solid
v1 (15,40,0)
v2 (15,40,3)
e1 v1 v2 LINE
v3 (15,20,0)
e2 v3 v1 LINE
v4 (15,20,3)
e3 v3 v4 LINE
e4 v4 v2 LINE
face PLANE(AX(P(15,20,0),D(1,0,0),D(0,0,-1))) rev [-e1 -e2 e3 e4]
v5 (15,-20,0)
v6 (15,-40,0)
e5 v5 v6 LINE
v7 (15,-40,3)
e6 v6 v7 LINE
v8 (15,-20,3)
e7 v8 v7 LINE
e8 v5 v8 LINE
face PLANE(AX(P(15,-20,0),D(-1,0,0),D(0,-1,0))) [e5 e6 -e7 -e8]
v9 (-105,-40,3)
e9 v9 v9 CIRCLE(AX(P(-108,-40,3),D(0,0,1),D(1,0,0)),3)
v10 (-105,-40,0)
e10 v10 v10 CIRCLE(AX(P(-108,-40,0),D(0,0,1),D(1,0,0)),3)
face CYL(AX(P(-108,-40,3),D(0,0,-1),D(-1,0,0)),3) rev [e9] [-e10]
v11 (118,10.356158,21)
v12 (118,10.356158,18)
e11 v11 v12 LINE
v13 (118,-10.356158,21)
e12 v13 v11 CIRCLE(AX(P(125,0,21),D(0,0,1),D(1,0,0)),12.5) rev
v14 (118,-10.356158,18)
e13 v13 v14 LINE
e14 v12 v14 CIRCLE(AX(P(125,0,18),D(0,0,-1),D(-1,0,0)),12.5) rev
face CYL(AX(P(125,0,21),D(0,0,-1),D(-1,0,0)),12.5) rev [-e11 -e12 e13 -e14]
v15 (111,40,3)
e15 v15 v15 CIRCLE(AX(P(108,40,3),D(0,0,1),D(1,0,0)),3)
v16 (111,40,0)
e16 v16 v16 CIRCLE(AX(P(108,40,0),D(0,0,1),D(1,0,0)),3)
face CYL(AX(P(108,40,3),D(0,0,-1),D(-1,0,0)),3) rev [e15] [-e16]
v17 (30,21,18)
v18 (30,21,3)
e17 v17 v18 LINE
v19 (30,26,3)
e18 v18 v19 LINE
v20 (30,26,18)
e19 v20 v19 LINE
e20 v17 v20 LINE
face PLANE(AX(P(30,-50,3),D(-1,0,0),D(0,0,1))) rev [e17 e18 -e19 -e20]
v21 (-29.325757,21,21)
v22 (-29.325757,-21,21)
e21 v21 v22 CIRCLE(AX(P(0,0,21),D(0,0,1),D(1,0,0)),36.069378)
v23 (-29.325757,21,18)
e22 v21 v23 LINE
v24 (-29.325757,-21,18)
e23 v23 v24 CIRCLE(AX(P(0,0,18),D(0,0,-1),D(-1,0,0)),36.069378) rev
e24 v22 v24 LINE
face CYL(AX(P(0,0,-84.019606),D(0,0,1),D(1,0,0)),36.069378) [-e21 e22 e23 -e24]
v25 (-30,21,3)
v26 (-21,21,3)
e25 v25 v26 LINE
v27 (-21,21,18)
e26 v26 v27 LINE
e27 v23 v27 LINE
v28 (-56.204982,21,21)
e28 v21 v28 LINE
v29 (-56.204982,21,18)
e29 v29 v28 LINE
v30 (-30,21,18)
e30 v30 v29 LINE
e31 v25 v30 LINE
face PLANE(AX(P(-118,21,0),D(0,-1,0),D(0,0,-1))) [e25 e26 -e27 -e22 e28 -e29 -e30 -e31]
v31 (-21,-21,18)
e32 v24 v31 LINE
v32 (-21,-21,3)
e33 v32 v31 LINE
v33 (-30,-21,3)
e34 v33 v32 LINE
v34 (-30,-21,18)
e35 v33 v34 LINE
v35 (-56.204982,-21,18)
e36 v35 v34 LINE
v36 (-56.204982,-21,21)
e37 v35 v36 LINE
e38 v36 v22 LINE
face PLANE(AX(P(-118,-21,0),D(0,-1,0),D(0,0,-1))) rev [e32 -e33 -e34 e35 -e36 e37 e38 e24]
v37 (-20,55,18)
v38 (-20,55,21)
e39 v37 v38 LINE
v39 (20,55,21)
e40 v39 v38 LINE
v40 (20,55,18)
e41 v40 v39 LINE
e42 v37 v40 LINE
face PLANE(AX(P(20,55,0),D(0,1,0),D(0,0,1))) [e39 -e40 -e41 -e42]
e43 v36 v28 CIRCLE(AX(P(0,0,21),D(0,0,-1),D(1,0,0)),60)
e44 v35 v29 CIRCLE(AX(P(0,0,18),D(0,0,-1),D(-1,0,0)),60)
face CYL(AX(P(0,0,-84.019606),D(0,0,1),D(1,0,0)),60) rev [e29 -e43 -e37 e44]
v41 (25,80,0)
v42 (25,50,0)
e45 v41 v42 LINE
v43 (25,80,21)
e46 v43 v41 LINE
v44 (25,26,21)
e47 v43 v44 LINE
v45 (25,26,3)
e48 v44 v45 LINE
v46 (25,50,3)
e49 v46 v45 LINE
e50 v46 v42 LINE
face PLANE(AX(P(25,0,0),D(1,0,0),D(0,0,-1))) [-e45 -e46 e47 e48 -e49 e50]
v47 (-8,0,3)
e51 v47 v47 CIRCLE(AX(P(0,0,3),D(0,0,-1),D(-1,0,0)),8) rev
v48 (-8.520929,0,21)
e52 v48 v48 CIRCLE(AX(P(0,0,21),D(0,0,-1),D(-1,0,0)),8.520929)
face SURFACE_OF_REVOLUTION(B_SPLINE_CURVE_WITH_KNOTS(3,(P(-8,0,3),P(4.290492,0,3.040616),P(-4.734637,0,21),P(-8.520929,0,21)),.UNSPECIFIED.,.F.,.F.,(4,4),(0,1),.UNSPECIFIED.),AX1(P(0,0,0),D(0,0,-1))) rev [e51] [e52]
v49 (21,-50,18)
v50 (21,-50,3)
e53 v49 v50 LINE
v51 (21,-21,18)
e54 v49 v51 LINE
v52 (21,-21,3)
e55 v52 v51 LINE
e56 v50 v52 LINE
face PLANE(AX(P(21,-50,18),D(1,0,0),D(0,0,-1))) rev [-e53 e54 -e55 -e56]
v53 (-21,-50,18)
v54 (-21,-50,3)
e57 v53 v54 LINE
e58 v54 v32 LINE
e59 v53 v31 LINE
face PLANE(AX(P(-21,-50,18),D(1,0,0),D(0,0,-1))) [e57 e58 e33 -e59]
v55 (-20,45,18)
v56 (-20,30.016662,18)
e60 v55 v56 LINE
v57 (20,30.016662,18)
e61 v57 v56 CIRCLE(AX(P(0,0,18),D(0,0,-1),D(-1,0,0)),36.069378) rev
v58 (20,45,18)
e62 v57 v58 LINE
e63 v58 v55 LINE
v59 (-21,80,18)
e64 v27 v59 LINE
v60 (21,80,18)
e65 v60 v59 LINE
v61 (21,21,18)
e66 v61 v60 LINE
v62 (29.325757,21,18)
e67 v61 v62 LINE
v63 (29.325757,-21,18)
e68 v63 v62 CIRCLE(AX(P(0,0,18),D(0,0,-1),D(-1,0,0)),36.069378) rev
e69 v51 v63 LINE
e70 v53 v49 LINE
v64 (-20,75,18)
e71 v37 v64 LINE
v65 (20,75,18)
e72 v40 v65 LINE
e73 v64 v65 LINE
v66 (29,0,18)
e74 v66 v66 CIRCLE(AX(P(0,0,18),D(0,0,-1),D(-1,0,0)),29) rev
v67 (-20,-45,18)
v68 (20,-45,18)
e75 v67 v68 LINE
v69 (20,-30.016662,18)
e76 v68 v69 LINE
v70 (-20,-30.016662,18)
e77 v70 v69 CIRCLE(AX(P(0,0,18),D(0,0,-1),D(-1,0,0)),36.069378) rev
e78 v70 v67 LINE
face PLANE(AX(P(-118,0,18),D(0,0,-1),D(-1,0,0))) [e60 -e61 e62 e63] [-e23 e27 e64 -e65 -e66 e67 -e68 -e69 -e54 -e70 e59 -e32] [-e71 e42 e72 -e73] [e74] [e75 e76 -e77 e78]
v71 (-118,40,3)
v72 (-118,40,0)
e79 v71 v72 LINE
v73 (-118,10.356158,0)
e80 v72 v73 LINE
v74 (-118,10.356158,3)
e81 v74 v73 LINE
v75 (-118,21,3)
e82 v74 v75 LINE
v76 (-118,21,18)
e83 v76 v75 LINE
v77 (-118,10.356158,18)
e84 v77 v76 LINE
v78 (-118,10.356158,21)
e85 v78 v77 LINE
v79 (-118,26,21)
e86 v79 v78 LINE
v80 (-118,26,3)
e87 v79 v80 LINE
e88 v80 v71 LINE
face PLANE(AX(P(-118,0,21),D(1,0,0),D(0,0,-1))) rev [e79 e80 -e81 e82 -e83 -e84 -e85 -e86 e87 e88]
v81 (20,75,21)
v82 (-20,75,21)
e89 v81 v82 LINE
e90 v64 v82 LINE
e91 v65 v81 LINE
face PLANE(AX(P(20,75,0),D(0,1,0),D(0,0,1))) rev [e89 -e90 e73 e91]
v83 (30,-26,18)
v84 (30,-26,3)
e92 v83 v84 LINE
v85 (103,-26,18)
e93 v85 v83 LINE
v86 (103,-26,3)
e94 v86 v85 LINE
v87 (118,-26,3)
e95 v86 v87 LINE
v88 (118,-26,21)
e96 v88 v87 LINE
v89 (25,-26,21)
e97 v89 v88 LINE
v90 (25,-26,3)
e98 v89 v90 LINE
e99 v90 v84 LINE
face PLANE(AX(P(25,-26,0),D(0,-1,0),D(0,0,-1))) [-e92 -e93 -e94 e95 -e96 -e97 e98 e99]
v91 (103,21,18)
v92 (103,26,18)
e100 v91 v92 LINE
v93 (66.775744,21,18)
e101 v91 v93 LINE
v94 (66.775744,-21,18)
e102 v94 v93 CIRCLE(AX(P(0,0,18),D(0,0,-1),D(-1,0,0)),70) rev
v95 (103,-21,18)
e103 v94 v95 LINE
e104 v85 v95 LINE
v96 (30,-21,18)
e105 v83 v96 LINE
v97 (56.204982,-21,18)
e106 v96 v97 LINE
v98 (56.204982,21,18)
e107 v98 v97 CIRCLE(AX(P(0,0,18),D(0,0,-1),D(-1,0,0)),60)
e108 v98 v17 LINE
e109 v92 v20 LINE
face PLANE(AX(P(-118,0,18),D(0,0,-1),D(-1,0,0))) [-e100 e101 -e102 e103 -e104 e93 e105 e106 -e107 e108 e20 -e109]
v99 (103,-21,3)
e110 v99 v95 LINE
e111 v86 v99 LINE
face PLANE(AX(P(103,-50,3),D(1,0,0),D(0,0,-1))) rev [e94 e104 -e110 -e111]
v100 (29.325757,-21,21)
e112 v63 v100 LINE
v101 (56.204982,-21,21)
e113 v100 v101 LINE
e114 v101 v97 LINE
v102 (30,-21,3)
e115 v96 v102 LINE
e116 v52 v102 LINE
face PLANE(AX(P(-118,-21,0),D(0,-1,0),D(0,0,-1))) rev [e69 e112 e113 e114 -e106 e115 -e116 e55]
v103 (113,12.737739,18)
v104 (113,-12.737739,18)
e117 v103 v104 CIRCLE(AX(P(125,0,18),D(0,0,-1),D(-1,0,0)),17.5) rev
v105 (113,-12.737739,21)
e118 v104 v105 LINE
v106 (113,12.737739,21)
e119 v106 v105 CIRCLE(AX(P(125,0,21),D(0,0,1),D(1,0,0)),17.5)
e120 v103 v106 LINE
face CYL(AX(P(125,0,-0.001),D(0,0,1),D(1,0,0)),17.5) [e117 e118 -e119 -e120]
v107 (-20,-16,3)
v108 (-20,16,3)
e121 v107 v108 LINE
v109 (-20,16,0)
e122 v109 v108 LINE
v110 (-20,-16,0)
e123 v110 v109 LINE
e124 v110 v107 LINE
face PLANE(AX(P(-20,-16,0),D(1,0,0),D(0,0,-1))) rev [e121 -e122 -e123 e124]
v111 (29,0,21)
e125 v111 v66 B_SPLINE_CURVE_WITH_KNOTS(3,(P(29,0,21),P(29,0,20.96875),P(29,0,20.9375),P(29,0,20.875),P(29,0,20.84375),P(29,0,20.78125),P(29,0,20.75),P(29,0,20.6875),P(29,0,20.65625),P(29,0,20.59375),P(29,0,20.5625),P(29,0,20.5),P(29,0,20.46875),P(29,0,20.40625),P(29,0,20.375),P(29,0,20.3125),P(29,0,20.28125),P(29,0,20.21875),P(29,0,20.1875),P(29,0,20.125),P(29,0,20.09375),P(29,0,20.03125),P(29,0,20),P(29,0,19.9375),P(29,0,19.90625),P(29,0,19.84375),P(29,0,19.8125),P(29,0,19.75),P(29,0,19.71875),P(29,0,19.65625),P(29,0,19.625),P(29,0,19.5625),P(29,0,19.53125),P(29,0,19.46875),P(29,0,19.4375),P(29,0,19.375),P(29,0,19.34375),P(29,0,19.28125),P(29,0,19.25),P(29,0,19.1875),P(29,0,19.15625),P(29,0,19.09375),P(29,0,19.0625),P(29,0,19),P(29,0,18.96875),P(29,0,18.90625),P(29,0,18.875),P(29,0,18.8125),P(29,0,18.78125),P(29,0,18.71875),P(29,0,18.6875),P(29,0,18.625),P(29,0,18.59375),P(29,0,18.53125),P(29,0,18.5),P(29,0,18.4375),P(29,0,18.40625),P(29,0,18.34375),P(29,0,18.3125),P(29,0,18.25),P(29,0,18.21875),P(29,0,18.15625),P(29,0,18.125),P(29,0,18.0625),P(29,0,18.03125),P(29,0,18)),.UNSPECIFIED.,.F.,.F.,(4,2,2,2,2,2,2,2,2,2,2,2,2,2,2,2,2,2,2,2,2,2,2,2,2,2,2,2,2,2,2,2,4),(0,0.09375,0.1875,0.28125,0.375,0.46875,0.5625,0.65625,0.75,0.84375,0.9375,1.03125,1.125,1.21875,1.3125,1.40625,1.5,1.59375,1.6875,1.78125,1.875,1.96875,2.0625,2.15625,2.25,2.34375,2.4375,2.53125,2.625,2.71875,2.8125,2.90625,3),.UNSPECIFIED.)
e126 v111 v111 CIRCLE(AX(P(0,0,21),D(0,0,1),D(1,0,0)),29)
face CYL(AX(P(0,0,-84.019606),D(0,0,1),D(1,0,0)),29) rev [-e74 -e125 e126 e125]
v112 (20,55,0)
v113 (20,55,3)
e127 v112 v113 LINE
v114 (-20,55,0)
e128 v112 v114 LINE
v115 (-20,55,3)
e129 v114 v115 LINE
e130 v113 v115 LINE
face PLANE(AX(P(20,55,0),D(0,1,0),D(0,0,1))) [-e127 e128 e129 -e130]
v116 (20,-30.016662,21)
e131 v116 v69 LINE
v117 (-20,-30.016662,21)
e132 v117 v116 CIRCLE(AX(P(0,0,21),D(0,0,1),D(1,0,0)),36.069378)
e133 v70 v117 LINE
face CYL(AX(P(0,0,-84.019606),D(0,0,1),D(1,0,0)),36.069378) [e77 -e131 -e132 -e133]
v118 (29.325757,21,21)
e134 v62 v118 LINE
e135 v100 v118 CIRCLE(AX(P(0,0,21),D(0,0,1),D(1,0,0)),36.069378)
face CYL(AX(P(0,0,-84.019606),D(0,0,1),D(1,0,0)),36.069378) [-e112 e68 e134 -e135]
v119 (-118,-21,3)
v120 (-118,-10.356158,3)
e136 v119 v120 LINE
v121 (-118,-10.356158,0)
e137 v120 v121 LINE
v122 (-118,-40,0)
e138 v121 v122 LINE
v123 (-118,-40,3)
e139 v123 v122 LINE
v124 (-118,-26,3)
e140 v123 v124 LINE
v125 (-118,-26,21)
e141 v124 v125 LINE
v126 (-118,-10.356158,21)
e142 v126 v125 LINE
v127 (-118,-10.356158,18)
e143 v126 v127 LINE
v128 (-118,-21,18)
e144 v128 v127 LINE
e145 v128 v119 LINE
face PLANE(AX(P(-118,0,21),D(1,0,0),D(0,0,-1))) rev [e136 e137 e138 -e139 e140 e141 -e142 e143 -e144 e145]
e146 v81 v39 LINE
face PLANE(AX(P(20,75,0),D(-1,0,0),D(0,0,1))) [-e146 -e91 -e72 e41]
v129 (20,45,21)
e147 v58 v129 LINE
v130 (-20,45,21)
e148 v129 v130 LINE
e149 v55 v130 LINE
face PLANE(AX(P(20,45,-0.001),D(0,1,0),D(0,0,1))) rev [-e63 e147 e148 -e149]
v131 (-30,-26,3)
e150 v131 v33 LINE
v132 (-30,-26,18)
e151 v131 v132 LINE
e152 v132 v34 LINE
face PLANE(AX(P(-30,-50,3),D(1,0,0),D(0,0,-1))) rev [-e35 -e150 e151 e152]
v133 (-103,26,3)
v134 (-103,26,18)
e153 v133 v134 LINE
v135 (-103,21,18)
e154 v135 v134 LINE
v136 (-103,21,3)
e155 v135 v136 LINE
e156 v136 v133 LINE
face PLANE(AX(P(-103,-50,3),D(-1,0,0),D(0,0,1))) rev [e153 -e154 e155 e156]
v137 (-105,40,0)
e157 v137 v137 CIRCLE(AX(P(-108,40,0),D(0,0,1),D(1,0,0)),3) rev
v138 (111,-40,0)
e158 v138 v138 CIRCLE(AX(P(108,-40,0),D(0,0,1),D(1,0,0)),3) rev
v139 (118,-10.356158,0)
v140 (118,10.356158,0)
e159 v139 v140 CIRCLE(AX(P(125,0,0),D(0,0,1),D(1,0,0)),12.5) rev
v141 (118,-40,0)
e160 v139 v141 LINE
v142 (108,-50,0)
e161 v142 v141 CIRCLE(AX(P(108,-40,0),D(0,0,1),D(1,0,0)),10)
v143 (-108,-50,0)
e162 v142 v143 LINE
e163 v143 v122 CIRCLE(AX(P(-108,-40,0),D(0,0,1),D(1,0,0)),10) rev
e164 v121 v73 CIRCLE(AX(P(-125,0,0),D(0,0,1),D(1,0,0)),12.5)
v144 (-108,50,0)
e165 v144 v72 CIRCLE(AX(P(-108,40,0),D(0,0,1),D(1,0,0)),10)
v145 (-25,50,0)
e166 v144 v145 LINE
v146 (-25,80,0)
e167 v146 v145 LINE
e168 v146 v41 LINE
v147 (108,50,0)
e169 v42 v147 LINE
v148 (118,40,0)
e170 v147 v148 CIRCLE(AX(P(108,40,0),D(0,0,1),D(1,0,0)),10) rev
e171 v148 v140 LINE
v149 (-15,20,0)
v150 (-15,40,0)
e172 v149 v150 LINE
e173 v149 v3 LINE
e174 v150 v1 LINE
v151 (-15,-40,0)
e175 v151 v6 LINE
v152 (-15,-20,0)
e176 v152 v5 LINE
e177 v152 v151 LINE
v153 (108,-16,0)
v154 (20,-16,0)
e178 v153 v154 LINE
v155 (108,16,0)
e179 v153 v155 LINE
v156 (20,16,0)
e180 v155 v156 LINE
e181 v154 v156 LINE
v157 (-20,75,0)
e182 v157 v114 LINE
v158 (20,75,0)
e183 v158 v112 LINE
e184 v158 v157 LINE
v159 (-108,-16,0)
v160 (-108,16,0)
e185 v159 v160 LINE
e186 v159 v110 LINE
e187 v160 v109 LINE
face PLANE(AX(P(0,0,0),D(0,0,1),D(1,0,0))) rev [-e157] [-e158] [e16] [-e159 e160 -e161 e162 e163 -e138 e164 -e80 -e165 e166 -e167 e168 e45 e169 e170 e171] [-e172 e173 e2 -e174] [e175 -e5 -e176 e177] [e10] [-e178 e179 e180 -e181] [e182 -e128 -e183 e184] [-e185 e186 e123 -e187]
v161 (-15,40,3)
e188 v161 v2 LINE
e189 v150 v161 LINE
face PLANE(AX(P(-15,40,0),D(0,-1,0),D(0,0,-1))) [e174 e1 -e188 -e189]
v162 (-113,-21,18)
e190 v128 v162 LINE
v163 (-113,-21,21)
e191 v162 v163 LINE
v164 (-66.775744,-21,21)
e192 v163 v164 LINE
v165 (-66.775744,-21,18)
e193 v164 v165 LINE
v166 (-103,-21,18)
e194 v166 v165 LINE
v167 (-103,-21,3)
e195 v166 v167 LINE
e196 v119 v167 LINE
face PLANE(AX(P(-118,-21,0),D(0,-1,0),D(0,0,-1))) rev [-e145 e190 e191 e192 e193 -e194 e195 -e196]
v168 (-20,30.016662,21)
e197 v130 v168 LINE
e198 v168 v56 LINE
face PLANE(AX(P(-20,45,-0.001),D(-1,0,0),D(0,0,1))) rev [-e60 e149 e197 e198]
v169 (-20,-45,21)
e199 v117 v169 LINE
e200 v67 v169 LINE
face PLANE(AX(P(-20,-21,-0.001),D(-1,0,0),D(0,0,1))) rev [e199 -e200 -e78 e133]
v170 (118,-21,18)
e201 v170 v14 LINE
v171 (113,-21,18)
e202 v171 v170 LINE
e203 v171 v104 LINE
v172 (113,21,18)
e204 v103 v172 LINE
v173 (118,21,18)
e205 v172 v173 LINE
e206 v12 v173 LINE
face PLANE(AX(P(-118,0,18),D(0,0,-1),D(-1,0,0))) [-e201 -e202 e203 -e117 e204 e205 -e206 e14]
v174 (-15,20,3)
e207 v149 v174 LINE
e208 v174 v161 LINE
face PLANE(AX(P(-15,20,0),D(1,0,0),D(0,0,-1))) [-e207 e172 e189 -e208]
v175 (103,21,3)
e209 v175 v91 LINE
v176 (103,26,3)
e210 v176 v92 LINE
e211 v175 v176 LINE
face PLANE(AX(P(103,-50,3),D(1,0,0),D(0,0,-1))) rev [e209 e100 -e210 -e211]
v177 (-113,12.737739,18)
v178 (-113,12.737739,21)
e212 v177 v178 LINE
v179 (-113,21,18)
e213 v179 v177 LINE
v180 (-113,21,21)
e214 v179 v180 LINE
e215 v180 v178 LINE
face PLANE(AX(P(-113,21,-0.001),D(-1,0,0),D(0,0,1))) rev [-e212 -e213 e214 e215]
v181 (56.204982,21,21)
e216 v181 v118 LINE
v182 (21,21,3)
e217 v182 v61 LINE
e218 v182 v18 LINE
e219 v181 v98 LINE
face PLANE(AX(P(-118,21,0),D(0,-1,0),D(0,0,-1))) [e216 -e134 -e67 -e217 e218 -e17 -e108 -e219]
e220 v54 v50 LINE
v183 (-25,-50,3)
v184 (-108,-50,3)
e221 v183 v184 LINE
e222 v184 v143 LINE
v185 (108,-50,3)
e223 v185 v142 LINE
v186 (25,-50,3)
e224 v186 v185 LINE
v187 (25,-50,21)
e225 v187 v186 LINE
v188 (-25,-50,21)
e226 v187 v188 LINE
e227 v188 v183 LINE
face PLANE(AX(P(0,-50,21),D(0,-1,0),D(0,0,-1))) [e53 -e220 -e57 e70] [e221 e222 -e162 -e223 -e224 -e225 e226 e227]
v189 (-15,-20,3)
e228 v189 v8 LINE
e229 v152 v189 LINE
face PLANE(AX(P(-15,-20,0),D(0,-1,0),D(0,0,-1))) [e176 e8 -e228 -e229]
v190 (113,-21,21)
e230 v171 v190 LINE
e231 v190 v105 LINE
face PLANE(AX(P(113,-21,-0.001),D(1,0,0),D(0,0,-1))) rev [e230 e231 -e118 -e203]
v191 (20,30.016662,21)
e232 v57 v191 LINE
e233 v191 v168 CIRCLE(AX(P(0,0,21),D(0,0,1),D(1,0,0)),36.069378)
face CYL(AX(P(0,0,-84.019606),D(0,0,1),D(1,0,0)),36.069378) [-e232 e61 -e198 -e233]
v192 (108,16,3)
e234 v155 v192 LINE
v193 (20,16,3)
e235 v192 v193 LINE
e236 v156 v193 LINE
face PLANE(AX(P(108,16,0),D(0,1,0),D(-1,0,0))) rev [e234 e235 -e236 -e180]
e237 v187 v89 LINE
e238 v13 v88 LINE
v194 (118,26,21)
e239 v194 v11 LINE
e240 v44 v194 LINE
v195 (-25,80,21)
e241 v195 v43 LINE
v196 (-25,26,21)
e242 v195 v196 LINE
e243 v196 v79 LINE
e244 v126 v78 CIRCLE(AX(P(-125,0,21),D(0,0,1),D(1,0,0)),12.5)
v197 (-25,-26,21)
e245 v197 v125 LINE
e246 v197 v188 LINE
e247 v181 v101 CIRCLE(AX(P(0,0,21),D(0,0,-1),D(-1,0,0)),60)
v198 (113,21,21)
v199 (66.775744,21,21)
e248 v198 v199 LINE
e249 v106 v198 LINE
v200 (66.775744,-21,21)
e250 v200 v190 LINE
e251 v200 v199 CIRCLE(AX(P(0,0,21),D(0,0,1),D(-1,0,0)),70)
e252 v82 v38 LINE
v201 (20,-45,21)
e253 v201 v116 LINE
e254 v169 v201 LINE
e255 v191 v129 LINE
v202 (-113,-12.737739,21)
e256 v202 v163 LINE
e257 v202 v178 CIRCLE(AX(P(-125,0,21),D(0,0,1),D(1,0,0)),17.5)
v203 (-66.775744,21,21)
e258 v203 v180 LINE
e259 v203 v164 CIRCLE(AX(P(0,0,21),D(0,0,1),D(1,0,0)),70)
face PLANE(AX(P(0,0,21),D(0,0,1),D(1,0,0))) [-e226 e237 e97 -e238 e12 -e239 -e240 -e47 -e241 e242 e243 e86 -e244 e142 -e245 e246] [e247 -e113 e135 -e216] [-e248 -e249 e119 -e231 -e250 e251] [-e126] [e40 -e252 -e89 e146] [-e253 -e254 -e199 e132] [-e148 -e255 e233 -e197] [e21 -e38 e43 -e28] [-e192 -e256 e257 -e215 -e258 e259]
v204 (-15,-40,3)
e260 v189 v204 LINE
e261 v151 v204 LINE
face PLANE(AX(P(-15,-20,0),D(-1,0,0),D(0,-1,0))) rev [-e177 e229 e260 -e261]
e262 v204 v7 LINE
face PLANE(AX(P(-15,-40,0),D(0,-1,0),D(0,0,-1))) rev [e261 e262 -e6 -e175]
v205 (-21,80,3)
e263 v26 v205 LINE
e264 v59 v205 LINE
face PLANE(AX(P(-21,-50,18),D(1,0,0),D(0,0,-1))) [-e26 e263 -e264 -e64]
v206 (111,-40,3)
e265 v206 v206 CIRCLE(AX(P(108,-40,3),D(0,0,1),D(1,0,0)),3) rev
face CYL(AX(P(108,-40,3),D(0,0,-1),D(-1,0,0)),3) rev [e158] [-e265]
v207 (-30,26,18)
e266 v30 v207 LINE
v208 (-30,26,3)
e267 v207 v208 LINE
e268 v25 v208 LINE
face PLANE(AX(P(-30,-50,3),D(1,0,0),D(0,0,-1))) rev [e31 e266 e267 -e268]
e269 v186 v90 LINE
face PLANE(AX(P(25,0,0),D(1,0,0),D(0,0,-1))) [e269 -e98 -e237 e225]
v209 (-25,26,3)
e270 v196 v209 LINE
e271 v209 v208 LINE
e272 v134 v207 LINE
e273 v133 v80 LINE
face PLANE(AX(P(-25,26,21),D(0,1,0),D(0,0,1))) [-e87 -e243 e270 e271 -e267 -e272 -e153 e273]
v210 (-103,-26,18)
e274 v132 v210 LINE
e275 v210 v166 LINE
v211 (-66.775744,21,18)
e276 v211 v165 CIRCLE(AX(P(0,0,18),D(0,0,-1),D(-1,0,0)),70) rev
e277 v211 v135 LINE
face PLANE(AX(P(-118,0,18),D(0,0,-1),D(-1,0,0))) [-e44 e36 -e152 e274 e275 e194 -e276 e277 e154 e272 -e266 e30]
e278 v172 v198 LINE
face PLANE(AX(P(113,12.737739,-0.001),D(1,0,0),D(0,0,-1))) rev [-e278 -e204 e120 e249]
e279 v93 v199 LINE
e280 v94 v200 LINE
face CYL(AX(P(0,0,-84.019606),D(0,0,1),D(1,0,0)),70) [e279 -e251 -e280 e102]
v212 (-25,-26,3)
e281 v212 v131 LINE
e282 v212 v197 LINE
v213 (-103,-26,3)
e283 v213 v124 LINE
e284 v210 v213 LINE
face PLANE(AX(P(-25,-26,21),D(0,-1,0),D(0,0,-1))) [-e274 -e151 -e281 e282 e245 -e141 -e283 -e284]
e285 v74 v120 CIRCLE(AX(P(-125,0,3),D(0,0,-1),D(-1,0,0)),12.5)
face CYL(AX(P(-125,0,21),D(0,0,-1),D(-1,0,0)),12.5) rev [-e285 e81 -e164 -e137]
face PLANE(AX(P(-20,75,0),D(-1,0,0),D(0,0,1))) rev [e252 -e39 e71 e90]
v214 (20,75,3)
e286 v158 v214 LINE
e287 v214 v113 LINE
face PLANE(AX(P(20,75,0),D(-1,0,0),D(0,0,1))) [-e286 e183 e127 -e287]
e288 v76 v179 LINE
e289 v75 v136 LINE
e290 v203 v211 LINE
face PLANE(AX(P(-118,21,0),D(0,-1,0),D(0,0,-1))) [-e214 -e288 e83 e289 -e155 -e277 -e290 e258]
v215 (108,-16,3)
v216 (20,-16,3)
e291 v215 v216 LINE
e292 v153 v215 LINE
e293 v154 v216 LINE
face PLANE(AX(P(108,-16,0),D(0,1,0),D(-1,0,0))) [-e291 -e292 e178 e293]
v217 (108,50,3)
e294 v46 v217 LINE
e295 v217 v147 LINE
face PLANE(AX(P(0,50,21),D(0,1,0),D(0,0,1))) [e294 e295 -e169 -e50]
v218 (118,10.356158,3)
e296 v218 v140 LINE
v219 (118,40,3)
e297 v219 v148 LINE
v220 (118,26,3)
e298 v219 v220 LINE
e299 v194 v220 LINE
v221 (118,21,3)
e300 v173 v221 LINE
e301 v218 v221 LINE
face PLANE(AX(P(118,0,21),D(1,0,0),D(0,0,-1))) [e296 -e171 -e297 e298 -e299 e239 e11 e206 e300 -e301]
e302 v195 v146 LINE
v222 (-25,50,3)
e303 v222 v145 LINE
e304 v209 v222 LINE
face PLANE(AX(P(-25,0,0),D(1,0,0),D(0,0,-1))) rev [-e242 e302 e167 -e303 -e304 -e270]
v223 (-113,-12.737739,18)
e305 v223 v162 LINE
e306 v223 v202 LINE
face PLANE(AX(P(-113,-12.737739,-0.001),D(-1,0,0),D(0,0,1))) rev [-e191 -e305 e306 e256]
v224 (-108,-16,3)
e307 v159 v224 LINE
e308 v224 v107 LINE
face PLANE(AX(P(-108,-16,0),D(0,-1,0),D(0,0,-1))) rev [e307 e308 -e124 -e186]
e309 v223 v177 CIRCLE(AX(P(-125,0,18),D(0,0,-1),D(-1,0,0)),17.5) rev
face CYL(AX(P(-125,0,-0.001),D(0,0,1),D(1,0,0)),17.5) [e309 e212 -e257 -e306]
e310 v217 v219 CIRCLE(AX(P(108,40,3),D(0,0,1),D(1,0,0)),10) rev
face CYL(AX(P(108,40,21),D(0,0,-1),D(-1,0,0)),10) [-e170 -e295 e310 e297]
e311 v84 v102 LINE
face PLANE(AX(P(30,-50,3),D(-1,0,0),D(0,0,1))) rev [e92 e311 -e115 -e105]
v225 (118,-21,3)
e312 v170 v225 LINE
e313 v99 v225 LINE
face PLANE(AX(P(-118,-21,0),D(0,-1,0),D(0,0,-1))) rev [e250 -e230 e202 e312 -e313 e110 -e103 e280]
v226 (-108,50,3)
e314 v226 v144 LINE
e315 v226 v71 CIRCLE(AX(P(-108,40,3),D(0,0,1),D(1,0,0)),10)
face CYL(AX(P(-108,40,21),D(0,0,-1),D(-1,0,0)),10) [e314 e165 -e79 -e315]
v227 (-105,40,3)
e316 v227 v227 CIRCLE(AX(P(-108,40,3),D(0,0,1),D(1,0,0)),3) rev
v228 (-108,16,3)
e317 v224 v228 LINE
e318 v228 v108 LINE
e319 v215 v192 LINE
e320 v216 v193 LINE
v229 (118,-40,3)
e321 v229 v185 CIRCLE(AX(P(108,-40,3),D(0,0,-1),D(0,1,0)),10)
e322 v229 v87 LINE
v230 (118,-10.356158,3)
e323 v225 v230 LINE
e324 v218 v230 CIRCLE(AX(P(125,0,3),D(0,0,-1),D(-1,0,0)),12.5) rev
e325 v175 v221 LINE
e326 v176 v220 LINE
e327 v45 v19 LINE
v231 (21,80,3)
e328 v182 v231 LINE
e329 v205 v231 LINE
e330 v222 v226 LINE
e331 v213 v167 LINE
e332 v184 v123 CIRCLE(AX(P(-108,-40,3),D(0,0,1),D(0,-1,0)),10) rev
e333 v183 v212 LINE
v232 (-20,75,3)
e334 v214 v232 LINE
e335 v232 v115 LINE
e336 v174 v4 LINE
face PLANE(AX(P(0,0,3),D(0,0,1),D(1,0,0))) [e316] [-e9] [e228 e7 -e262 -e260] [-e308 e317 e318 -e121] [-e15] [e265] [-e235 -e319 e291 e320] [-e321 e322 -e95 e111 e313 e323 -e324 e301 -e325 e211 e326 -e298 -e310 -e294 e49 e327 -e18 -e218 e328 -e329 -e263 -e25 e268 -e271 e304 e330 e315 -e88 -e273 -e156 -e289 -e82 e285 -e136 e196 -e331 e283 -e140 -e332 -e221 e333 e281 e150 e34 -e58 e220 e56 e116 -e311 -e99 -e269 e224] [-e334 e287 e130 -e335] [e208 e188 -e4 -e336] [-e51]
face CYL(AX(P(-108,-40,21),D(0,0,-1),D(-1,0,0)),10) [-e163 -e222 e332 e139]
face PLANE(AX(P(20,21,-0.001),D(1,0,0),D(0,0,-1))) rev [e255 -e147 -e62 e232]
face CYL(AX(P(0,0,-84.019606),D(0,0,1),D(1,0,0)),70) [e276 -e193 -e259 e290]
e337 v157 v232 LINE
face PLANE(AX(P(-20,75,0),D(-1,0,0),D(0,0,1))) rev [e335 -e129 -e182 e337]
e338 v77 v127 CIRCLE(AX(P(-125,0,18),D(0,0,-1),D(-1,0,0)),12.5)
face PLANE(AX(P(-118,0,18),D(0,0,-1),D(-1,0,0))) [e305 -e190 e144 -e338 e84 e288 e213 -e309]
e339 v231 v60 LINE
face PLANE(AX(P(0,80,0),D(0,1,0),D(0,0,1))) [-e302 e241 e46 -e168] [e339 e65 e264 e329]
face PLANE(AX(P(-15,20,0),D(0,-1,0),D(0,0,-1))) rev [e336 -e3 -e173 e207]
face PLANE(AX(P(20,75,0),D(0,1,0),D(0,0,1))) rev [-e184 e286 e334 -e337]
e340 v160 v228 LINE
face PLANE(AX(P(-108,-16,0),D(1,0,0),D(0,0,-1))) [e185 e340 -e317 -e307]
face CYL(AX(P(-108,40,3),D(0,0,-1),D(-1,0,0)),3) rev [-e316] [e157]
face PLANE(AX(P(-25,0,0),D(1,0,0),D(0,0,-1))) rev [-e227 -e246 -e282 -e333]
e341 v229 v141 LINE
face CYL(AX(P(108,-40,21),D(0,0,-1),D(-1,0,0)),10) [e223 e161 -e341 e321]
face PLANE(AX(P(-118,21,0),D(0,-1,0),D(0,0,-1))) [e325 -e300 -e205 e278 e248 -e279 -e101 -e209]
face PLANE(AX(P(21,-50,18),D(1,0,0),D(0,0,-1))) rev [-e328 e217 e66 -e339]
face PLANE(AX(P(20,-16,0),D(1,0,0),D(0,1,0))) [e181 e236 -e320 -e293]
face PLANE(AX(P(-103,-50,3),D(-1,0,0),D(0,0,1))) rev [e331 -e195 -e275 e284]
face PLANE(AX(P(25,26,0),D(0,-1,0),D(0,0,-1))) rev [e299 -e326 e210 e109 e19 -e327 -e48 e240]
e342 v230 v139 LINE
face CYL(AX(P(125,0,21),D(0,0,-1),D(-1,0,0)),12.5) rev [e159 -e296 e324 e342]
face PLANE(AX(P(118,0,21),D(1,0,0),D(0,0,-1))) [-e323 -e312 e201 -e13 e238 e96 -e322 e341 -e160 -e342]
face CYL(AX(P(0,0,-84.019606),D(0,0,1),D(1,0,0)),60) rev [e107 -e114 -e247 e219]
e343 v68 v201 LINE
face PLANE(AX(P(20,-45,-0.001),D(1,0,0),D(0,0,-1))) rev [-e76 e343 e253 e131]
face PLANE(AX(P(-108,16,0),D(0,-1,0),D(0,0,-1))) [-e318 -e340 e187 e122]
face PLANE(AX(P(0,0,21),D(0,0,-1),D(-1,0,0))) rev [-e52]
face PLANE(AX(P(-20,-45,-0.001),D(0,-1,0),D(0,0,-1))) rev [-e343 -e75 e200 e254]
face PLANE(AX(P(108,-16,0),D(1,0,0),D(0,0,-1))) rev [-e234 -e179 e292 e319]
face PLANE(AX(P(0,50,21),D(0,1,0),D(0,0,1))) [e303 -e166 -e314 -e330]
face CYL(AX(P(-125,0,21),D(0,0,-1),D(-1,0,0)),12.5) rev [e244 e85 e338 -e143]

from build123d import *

# Parameters (mm, degrees)
EXTRUDE_1_OUTLINE_R   = 6
EXTRUDE_1_DEPTH       = 21
EXTRUDE_2_OUTLINE_R   = 6
EXTRUDE_2_OUTLINE_R_2 = 3
EXTRUDE_2_DEPTH       = 3
SKETCH_2_W            = 15
SKETCH_2_H            = 42
CUT_EXTRUDE_1_DEPTH   = 243.150779474
SKETCH_3_W            = 42
SKETCH_3_H            = 15
CUT_EXTRUDE_2_DEPTH   = 157.092921044
SKETCH_2_3_W          = 18
SKETCH_2_3_H          = 14
SKETCH_2_3_H_2        = 10
SKETCH_2_3_H_3        = 24
CUT_EXTRUDE_3_DEPTH   = 93
CUT_EXTRUDE_START     = -236
SKETCH_2_4_W          = 15
SKETCH_2_4_H          = 42
SKETCH_2_4_W_2        = 18
SKETCH_2_4_H_2        = 24
CUT_EXTRUDE_4_DEPTH   = 93
SKETCH_3_3_W          = 42
SKETCH_3_3_H          = 15
SKETCH_3_3_W_2        = 73
CUT_EXTRUDE_5_DEPTH   = 157.092921044
CUT_EXTRUDE_6_REACH   = 131.865
SKETCH_6_W            = 88
SKETCH_6_H            = 32
SKETCH_6_W_2          = 30
SKETCH_6_H_2          = 20
CUT_EXTRUDE_7_DEPTH   = 130.414064165
SKETCH_7_R            = 36.069377594
SKETCH_7_R_2          = 29
EXTRUDE_3_DEPTH       = 3
SKETCH_8_W            = 50
SKETCH_8_H            = 21
SKETCH_8_W_2          = 42
SKETCH_8_H_2          = 15
EXTRUDE_4_DEPTH       = 30
SKETCH_9_W            = 40
SKETCH_9_H            = 20
CUT_EXTRUDE_8_DEPTH   = 145.100659263


# Read off the part's stored shape, not the designer's step: 凸台-拉伸1, 凸台-拉伸2
with BuildPart() as part:
    # 凸台-拉伸1 outline → 凸台-拉伸1 (new body)
    with BuildSketch(Plane.XY):
        with BuildLine():
            ThreePointArc((118, 40), (115.071067812, 47.071067812), (108, 50))
            Line((108, 50), (-108, 50))
            ThreePointArc((-108, 50), (-115.071067812, 47.071067812), (-118, 40))
            Line((-118, 40), (-118, 10.356157589))
            ThreePointArc((-118, 10.356157589), (-112.5, 0), (-118, -10.356157589))
            Line((-118, -10.356157589), (-118, -40))
            ThreePointArc((-118, -40), (-115.071067812, -47.071067812), (-108, -50))
            Line((-108, -50), (108, -50))
            ThreePointArc((108, -50), (115.071067812, -47.071067812), (118, -40))
            Line((118, -40), (118, -10.356157589))
            ThreePointArc((118, -10.356157589), (112.5, 0), (118, 10.356157589))
            Line((118, 10.356157589), (118, 40))
        make_face()
        with Locations((-108, -40)):
            Circle(EXTRUDE_1_OUTLINE_R, mode=Mode.SUBTRACT)
        with Locations((108, -40)):
            Circle(EXTRUDE_1_OUTLINE_R, mode=Mode.SUBTRACT)
        with Locations((-108, 40)):
            Circle(EXTRUDE_1_OUTLINE_R, mode=Mode.SUBTRACT)
        with Locations((108, 40)):
            Circle(EXTRUDE_1_OUTLINE_R, mode=Mode.SUBTRACT)
    extrude(amount=EXTRUDE_1_DEPTH)

    # 凸台-拉伸2 outline → 凸台-拉伸2 (add)
    # profile 1 of 4: a face of its own
    with BuildSketch(Plane.XY):
        with Locations((108, -40)):
            Circle(EXTRUDE_2_OUTLINE_R)
        with Locations((108, -40)):
            Circle(EXTRUDE_2_OUTLINE_R_2, mode=Mode.SUBTRACT)
    # profile 2 of 4: a face of its own
    with BuildSketch(Plane.XY):
        with Locations((-108, 40)):
            Circle(EXTRUDE_2_OUTLINE_R)
        with Locations((-108, 40)):
            Circle(EXTRUDE_2_OUTLINE_R_2, mode=Mode.SUBTRACT)
    # profile 3 of 4: a face of its own
    with BuildSketch(Plane.XY):
        with Locations((-108, -40)):
            Circle(EXTRUDE_2_OUTLINE_R)
        with Locations((-108, -40)):
            Circle(EXTRUDE_2_OUTLINE_R_2, mode=Mode.SUBTRACT)
    # profile 4 of 4: a face of its own
    with BuildSketch(Plane.XY):
        with Locations((108, 40)):
            Circle(EXTRUDE_2_OUTLINE_R)
        with Locations((108, 40)):
            Circle(EXTRUDE_2_OUTLINE_R_2, mode=Mode.SUBTRACT)
    extrude(amount=EXTRUDE_2_DEPTH)

    # 草图2 → 切除-拉伸1 (cut, through all)
    with BuildSketch(Plane(origin=(118, 0, 0), x_dir=(0, 0, -1), z_dir=(1, 0, 0))):
        with Locations((-10.5, 0)):
            Rectangle(SKETCH_2_W, SKETCH_2_H)
    extrude(amount=-CUT_EXTRUDE_1_DEPTH, mode=Mode.SUBTRACT)

    # 草图3 → 切除-拉伸2 (cut, through all)
    with BuildSketch(Plane(origin=(0, 50, 0), x_dir=(1, 0, 0), z_dir=(0, 1, 0))):
        with Locations((0, -10.5)):
            Rectangle(SKETCH_3_W, SKETCH_3_H)
    extrude(amount=-CUT_EXTRUDE_2_DEPTH, mode=Mode.SUBTRACT)

    # 草图2<3> → 切除-拉伸3 (cut)
    with BuildSketch(Plane(origin=(118, 0, 0), x_dir=(0, 0, -1), z_dir=(1, 0, 0))):
        with Locations((-12, 33)):
            Rectangle(SKETCH_2_3_W, SKETCH_2_3_H)
        with Locations((-12, 45)):
            Rectangle(SKETCH_2_3_W, SKETCH_2_3_H_2)
        with Locations((-12, -38)):
            Rectangle(SKETCH_2_3_W, SKETCH_2_3_H_3)
    extrude(amount=-CUT_EXTRUDE_3_DEPTH, mode=Mode.SUBTRACT)

    # 草图2<4> → 切除-拉伸4 (cut)
    with BuildSketch(Plane(origin=(118, 0, 0), x_dir=(0, 0, -1), z_dir=(1, 0, 0)).offset(CUT_EXTRUDE_START)):
        with Locations((-10.5, 0)):
            Rectangle(SKETCH_2_4_W, SKETCH_2_4_H)
        with Locations((-12, -38)):
            Rectangle(SKETCH_2_4_W_2, SKETCH_2_4_H_2)
        with Locations((-12, 38)):
            Rectangle(SKETCH_2_4_W_2, SKETCH_2_4_H_2)
    extrude(amount=CUT_EXTRUDE_4_DEPTH, mode=Mode.SUBTRACT)

    # 草图3<3> → 切除-拉伸5 (cut, through all)
    with BuildSketch(Plane(origin=(0, 50, 0), x_dir=(1, 0, 0), z_dir=(0, 1, 0))):
        with Locations((0, -10.5)):
            Rectangle(SKETCH_3_3_W, SKETCH_3_3_H)
        with Locations((-66.5, -10.5)):
            Rectangle(SKETCH_3_3_W_2, SKETCH_3_3_H)
        with Locations((66.5, -10.5)):
            Rectangle(SKETCH_3_3_W_2, SKETCH_3_3_H)
    extrude(amount=-CUT_EXTRUDE_5_DEPTH, mode=Mode.SUBTRACT)

    # 草图4 → 切除-拉伸6 (cut, up to next)
    with BuildSketch(Plane.XY.offset(21), mode=Mode.PRIVATE) as cut_extrude_6_sk1:
        with BuildLine():
            Line((-113, -12.737739203), (-113, -21))
            Line((-113, -21), (-20, -21))
            Line((-20, -21), (-20, -45))
            Line((-20, -45), (20, -45))
            Line((20, -45), (20, -21))
            Line((20, -21), (113, -21))
            Line((113, -21), (113, -12.737739203))
            ThreePointArc((113, -12.737739203), (107.5, 0), (113, 12.737739203))
            Line((113, 12.737739203), (113, 21))
            Line((113, 21), (20, 21))
            Line((20, 21), (20, 45))
            Line((20, 45), (-20, 45))
            Line((-20, 45), (-20, 21))
            Line((-20, 21), (-113, 21))
            Line((-113, 21), (-113, 12.737739203))
            ThreePointArc((-113, 12.737739203), (-107.5, 0), (-113, -12.737739203))
        make_face()
    cut_extrude_6_tool1 = extrude(cut_extrude_6_sk1.sketch, amount=-CUT_EXTRUDE_6_REACH, mode=Mode.PRIVATE) & part.part
    add(cut_extrude_6_tool1.solids().sort_by_distance((0, 0, 21))[0], mode=Mode.SUBTRACT)

    # 草图5 → 旋转1 (revolve)
    with BuildSketch(Plane.XZ):
        with BuildLine():
            Line((-8, 3), (0, 3))
            Line((0, 3), (0, 21))
            Line((0, 21), (-8.520929424, 21))
            add(Edge.make_bspline(
                [(-8, 3), (4.290492331, 3.04061628), (-4.734637162, 21), (-8.520929424, 21)],
                knots=[0, 0, 0, 0, 1, 1, 1, 1], degree=3))
        make_face()
    revolve(axis=Axis((0, 0, 0), (0, 0, 1)))

    # 草图6 → 切除-拉伸7 (cut, through all)
    with BuildSketch(Plane.XY.offset(3)):
        with Locations((-64, 0)):
            Rectangle(SKETCH_6_W, SKETCH_6_H)
        with Locations((0, 30)):
            Rectangle(SKETCH_6_W_2, SKETCH_6_H_2)
        with Locations((64, 0)):
            Rectangle(SKETCH_6_W, SKETCH_6_H)
        with Locations((0, -30)):
            Rectangle(SKETCH_6_W_2, SKETCH_6_H_2)
    extrude(amount=-CUT_EXTRUDE_7_DEPTH, mode=Mode.SUBTRACT)

    # 草图7 → 凸台-拉伸3 (add)
    # profile 1 of 3: a face of its own
    with BuildSketch(Plane.XY.offset(21)):
        Circle(SKETCH_7_R)
        Circle(SKETCH_7_R_2, mode=Mode.SUBTRACT)
    # profile 2 of 3: a face of its own
    with BuildSketch(Plane.XY.offset(21)):
        with BuildLine():
            Line((-64.992307237, 26), (-54.074023338, 26))
            ThreePointArc((-54.074023338, 26), (-60, 0), (-54.074023338, -26))
            Line((-54.074023338, -26), (-64.992307237, -26))
            ThreePointArc((-64.992307237, -26), (-70, 0), (-64.992307237, 26))
        make_face()
    # profile 3 of 3: a face of its own
    with BuildSketch(Plane.XY.offset(21)):
        with BuildLine():
            Line((64.992307237, 26), (54.074023338, 26))
            ThreePointArc((54.074023338, 26), (60, 0), (54.074023338, -26))
            Line((54.074023338, -26), (64.992307237, -26))
            ThreePointArc((64.992307237, -26), (70, 0), (64.992307237, 26))
        make_face()
    extrude(amount=-EXTRUDE_3_DEPTH)

    # 草图8 → 凸台-拉伸4 (add)
    with BuildSketch(Plane(origin=(0, 50, 0), x_dir=(1, 0, 0), z_dir=(0, 1, 0))):
        with Locations((0, -10.5)):
            Rectangle(SKETCH_8_W, SKETCH_8_H)
        with Locations((0, -10.5)):
            Rectangle(SKETCH_8_W_2, SKETCH_8_H_2, mode=Mode.SUBTRACT)
    extrude(amount=EXTRUDE_4_DEPTH)

    # 草图9 → 切除-拉伸8 (cut, through all)
    with BuildSketch(Plane.XY.offset(21)):
        with Locations((0, 65)):
            Rectangle(SKETCH_9_W, SKETCH_9_H)
    extrude(amount=-CUT_EXTRUDE_8_DEPTH, mode=Mode.SUBTRACT)


solid = part.part
